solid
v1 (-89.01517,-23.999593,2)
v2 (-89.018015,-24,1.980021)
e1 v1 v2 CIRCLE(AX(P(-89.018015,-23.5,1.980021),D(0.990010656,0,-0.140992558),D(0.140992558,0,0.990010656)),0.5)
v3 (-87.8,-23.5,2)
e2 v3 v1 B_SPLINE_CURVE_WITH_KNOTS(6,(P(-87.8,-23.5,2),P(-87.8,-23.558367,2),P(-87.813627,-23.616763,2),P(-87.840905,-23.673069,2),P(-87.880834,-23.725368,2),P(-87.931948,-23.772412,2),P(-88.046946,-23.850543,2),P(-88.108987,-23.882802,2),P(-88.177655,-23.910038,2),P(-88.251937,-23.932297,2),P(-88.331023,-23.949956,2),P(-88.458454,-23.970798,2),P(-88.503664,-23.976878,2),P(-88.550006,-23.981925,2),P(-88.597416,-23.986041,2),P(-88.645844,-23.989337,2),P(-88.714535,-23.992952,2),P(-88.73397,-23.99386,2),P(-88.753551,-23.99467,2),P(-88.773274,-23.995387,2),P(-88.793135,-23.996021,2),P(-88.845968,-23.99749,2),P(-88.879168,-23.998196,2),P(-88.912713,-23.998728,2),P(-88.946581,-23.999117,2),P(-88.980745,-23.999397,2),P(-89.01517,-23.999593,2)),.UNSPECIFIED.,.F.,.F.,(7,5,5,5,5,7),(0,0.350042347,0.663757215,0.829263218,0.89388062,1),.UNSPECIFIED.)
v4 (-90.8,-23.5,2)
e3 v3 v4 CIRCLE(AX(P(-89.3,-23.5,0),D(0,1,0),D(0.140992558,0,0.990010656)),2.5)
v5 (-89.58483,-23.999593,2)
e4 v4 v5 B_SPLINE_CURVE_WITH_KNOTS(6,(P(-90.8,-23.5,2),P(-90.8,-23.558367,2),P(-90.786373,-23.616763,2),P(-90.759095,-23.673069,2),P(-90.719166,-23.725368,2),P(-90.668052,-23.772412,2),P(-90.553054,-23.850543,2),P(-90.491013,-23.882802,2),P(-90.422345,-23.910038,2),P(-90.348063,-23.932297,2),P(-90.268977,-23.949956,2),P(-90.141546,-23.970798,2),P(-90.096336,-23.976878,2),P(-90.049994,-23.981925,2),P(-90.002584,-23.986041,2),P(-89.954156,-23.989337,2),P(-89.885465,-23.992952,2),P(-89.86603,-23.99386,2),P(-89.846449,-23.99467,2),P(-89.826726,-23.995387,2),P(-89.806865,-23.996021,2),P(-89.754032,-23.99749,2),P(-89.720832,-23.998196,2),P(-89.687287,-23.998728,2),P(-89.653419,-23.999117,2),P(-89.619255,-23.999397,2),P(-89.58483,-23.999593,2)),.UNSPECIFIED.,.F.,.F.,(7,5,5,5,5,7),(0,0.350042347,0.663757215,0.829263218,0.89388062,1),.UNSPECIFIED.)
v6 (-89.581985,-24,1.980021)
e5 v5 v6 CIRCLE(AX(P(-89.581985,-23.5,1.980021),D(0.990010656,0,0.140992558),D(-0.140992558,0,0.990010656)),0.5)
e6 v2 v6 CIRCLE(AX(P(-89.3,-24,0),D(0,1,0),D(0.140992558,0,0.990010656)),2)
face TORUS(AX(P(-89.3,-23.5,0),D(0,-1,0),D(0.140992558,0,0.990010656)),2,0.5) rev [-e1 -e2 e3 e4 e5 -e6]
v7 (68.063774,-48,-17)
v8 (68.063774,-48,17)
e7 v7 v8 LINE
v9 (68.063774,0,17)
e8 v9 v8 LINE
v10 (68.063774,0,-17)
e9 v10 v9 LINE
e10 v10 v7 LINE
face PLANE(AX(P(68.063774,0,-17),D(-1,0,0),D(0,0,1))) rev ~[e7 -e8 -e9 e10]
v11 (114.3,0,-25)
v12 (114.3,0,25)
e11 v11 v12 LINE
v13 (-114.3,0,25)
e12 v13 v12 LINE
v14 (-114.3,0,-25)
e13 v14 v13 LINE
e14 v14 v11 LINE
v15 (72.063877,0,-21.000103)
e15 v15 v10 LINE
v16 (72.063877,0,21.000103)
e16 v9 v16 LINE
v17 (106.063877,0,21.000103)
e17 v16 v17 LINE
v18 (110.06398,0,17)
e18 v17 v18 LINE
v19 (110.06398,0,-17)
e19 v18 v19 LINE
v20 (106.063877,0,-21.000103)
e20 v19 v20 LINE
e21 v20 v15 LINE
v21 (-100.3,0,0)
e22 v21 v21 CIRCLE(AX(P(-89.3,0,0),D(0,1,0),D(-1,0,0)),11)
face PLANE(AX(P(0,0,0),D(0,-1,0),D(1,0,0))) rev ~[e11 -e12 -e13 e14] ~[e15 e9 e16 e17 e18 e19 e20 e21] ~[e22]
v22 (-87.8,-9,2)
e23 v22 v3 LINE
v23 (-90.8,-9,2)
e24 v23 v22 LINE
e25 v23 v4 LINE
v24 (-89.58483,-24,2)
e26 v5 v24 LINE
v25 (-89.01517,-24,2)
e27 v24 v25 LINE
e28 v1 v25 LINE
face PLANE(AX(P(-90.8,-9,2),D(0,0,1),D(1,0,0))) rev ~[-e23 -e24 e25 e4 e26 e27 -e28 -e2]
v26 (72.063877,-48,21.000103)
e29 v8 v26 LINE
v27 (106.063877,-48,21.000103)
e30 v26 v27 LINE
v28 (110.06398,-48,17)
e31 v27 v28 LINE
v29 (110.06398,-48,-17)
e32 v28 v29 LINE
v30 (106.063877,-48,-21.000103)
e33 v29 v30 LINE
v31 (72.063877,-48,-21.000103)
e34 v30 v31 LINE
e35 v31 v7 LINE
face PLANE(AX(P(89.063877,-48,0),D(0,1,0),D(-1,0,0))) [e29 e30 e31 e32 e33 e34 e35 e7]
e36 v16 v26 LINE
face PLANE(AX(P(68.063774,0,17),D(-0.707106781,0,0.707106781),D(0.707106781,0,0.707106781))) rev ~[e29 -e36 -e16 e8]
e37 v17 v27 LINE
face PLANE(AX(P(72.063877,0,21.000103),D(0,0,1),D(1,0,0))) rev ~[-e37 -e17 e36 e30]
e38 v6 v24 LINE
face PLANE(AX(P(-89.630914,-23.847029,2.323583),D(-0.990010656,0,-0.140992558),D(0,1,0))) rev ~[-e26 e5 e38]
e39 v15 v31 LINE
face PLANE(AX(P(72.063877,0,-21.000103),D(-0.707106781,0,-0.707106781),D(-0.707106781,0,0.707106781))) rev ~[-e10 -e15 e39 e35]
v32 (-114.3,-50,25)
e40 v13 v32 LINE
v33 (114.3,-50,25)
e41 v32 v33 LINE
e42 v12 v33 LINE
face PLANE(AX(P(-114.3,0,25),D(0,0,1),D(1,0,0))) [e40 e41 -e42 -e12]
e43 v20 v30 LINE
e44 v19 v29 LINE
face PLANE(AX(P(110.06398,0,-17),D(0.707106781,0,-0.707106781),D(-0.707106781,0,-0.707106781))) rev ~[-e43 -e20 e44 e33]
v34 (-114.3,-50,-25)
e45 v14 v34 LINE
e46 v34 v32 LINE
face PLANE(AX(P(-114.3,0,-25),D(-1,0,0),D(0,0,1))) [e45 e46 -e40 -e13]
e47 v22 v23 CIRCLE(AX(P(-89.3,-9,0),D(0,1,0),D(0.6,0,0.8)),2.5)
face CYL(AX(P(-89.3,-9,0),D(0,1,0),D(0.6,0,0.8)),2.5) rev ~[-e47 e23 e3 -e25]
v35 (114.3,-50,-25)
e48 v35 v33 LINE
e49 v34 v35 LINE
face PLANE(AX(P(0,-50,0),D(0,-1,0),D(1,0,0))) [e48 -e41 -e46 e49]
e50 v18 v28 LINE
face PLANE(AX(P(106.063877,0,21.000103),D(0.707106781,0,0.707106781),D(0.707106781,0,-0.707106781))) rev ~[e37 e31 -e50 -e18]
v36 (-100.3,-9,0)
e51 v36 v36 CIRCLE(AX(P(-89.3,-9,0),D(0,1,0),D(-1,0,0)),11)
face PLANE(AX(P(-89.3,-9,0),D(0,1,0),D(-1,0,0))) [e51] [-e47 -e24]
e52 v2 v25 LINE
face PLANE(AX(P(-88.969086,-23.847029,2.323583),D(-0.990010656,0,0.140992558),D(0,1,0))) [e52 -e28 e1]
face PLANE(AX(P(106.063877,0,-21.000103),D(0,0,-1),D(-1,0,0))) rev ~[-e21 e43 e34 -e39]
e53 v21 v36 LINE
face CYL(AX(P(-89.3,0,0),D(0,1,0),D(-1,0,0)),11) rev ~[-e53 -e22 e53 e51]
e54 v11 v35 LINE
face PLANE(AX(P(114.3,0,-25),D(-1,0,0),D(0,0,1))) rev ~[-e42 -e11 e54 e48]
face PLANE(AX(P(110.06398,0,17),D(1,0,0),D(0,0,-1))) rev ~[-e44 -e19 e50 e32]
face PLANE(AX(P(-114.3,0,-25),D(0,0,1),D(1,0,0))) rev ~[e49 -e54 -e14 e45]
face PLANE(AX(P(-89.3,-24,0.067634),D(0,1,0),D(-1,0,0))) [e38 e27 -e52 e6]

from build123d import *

# Parameters (mm, degrees)
F0_W        = 228.6
F0_H        = 50
F1_DEPTH    = 50
F3_DEPTH    = 48
F4_R        = 11
F5_DEPTH    = 9
F7_DEPTH    = 15
F8_T2_ANGLE = 343.7894292622


# Not quite as in the source:
# - a fillet or chamfer that OpenCascade refuses, or shapes differently, is made with other operations: its cross-section is extruded or revolved along the edge and cut away or added


with BuildPart() as f1:
    # F0 (on Front) → F1 (new body)
    with BuildSketch(Plane.XZ):
        Rectangle(F0_W, F0_H)
    extrude(amount=F1_DEPTH)

    # F2 (on face) → F3 (cut)
    with BuildSketch(Plane(origin=(0, 0, 0), x_dir=(-1, 0, 0), z_dir=(0, 1, 0))):
        Polygon((-106.0638769388, 21.0001030612), (-110.06398, 17), (-110.06398, -17), (-106.0638769388, -21.0001030612), (-72.0638769388, -21.0001030612), (-68.0637738777, -17), (-68.0637738777, 17), (-72.0638769388, 21.0001030612), align=None)
    extrude(amount=-F3_DEPTH, mode=Mode.SUBTRACT)

    # F4 (on face) → F5 (cut)
    with BuildSketch(Plane(origin=(0, 0, 0), x_dir=(-1, 0, 0), z_dir=(0, 1, 0))):
        with Locations((89.3, 0)):
            Circle(F4_R)
    extrude(amount=-F5_DEPTH, mode=Mode.SUBTRACT)

    # F6 (on face) → F7 (cut)
    with BuildSketch(Plane(origin=(0, -9, 0), x_dir=(-1, 0, 0), z_dir=(0, 1, 0))):
        with BuildLine():
            Line((90.8, 2), (87.8, 2))
            ThreePointArc((87.8, 2), (89.3, -2.5), (90.8, 2))
        make_face()
    extrude(amount=-F7_DEPTH, mode=Mode.SUBTRACT)

    # F8: fillet of radius 0.5 on 1 edges, made by hand

    # F8_s1 → F8_t2 (revolve)
    with BuildSketch(Plane(origin=(-87.5248141005, 0, 12.4648632504), x_dir=(0, 1, 0), z_dir=(-0.9900106558, 0, 0.1409925581))):
        with BuildLine():
            ThreePointArc((-23.5, 10.0906354418), (-23.8535533906, 10.2370820512), (-24, 10.5906354418))
            Line((-24, 10.5906354418), (-24, 10.0906354418))
            Line((-24, 10.0906354418), (-23.5, 10.0906354418))
        make_face()
    revolve(axis=Axis((-89.3, -24, 0), (0, 1, 0)), revolution_arc=F8_T2_ANGLE)


solid = f1.part
